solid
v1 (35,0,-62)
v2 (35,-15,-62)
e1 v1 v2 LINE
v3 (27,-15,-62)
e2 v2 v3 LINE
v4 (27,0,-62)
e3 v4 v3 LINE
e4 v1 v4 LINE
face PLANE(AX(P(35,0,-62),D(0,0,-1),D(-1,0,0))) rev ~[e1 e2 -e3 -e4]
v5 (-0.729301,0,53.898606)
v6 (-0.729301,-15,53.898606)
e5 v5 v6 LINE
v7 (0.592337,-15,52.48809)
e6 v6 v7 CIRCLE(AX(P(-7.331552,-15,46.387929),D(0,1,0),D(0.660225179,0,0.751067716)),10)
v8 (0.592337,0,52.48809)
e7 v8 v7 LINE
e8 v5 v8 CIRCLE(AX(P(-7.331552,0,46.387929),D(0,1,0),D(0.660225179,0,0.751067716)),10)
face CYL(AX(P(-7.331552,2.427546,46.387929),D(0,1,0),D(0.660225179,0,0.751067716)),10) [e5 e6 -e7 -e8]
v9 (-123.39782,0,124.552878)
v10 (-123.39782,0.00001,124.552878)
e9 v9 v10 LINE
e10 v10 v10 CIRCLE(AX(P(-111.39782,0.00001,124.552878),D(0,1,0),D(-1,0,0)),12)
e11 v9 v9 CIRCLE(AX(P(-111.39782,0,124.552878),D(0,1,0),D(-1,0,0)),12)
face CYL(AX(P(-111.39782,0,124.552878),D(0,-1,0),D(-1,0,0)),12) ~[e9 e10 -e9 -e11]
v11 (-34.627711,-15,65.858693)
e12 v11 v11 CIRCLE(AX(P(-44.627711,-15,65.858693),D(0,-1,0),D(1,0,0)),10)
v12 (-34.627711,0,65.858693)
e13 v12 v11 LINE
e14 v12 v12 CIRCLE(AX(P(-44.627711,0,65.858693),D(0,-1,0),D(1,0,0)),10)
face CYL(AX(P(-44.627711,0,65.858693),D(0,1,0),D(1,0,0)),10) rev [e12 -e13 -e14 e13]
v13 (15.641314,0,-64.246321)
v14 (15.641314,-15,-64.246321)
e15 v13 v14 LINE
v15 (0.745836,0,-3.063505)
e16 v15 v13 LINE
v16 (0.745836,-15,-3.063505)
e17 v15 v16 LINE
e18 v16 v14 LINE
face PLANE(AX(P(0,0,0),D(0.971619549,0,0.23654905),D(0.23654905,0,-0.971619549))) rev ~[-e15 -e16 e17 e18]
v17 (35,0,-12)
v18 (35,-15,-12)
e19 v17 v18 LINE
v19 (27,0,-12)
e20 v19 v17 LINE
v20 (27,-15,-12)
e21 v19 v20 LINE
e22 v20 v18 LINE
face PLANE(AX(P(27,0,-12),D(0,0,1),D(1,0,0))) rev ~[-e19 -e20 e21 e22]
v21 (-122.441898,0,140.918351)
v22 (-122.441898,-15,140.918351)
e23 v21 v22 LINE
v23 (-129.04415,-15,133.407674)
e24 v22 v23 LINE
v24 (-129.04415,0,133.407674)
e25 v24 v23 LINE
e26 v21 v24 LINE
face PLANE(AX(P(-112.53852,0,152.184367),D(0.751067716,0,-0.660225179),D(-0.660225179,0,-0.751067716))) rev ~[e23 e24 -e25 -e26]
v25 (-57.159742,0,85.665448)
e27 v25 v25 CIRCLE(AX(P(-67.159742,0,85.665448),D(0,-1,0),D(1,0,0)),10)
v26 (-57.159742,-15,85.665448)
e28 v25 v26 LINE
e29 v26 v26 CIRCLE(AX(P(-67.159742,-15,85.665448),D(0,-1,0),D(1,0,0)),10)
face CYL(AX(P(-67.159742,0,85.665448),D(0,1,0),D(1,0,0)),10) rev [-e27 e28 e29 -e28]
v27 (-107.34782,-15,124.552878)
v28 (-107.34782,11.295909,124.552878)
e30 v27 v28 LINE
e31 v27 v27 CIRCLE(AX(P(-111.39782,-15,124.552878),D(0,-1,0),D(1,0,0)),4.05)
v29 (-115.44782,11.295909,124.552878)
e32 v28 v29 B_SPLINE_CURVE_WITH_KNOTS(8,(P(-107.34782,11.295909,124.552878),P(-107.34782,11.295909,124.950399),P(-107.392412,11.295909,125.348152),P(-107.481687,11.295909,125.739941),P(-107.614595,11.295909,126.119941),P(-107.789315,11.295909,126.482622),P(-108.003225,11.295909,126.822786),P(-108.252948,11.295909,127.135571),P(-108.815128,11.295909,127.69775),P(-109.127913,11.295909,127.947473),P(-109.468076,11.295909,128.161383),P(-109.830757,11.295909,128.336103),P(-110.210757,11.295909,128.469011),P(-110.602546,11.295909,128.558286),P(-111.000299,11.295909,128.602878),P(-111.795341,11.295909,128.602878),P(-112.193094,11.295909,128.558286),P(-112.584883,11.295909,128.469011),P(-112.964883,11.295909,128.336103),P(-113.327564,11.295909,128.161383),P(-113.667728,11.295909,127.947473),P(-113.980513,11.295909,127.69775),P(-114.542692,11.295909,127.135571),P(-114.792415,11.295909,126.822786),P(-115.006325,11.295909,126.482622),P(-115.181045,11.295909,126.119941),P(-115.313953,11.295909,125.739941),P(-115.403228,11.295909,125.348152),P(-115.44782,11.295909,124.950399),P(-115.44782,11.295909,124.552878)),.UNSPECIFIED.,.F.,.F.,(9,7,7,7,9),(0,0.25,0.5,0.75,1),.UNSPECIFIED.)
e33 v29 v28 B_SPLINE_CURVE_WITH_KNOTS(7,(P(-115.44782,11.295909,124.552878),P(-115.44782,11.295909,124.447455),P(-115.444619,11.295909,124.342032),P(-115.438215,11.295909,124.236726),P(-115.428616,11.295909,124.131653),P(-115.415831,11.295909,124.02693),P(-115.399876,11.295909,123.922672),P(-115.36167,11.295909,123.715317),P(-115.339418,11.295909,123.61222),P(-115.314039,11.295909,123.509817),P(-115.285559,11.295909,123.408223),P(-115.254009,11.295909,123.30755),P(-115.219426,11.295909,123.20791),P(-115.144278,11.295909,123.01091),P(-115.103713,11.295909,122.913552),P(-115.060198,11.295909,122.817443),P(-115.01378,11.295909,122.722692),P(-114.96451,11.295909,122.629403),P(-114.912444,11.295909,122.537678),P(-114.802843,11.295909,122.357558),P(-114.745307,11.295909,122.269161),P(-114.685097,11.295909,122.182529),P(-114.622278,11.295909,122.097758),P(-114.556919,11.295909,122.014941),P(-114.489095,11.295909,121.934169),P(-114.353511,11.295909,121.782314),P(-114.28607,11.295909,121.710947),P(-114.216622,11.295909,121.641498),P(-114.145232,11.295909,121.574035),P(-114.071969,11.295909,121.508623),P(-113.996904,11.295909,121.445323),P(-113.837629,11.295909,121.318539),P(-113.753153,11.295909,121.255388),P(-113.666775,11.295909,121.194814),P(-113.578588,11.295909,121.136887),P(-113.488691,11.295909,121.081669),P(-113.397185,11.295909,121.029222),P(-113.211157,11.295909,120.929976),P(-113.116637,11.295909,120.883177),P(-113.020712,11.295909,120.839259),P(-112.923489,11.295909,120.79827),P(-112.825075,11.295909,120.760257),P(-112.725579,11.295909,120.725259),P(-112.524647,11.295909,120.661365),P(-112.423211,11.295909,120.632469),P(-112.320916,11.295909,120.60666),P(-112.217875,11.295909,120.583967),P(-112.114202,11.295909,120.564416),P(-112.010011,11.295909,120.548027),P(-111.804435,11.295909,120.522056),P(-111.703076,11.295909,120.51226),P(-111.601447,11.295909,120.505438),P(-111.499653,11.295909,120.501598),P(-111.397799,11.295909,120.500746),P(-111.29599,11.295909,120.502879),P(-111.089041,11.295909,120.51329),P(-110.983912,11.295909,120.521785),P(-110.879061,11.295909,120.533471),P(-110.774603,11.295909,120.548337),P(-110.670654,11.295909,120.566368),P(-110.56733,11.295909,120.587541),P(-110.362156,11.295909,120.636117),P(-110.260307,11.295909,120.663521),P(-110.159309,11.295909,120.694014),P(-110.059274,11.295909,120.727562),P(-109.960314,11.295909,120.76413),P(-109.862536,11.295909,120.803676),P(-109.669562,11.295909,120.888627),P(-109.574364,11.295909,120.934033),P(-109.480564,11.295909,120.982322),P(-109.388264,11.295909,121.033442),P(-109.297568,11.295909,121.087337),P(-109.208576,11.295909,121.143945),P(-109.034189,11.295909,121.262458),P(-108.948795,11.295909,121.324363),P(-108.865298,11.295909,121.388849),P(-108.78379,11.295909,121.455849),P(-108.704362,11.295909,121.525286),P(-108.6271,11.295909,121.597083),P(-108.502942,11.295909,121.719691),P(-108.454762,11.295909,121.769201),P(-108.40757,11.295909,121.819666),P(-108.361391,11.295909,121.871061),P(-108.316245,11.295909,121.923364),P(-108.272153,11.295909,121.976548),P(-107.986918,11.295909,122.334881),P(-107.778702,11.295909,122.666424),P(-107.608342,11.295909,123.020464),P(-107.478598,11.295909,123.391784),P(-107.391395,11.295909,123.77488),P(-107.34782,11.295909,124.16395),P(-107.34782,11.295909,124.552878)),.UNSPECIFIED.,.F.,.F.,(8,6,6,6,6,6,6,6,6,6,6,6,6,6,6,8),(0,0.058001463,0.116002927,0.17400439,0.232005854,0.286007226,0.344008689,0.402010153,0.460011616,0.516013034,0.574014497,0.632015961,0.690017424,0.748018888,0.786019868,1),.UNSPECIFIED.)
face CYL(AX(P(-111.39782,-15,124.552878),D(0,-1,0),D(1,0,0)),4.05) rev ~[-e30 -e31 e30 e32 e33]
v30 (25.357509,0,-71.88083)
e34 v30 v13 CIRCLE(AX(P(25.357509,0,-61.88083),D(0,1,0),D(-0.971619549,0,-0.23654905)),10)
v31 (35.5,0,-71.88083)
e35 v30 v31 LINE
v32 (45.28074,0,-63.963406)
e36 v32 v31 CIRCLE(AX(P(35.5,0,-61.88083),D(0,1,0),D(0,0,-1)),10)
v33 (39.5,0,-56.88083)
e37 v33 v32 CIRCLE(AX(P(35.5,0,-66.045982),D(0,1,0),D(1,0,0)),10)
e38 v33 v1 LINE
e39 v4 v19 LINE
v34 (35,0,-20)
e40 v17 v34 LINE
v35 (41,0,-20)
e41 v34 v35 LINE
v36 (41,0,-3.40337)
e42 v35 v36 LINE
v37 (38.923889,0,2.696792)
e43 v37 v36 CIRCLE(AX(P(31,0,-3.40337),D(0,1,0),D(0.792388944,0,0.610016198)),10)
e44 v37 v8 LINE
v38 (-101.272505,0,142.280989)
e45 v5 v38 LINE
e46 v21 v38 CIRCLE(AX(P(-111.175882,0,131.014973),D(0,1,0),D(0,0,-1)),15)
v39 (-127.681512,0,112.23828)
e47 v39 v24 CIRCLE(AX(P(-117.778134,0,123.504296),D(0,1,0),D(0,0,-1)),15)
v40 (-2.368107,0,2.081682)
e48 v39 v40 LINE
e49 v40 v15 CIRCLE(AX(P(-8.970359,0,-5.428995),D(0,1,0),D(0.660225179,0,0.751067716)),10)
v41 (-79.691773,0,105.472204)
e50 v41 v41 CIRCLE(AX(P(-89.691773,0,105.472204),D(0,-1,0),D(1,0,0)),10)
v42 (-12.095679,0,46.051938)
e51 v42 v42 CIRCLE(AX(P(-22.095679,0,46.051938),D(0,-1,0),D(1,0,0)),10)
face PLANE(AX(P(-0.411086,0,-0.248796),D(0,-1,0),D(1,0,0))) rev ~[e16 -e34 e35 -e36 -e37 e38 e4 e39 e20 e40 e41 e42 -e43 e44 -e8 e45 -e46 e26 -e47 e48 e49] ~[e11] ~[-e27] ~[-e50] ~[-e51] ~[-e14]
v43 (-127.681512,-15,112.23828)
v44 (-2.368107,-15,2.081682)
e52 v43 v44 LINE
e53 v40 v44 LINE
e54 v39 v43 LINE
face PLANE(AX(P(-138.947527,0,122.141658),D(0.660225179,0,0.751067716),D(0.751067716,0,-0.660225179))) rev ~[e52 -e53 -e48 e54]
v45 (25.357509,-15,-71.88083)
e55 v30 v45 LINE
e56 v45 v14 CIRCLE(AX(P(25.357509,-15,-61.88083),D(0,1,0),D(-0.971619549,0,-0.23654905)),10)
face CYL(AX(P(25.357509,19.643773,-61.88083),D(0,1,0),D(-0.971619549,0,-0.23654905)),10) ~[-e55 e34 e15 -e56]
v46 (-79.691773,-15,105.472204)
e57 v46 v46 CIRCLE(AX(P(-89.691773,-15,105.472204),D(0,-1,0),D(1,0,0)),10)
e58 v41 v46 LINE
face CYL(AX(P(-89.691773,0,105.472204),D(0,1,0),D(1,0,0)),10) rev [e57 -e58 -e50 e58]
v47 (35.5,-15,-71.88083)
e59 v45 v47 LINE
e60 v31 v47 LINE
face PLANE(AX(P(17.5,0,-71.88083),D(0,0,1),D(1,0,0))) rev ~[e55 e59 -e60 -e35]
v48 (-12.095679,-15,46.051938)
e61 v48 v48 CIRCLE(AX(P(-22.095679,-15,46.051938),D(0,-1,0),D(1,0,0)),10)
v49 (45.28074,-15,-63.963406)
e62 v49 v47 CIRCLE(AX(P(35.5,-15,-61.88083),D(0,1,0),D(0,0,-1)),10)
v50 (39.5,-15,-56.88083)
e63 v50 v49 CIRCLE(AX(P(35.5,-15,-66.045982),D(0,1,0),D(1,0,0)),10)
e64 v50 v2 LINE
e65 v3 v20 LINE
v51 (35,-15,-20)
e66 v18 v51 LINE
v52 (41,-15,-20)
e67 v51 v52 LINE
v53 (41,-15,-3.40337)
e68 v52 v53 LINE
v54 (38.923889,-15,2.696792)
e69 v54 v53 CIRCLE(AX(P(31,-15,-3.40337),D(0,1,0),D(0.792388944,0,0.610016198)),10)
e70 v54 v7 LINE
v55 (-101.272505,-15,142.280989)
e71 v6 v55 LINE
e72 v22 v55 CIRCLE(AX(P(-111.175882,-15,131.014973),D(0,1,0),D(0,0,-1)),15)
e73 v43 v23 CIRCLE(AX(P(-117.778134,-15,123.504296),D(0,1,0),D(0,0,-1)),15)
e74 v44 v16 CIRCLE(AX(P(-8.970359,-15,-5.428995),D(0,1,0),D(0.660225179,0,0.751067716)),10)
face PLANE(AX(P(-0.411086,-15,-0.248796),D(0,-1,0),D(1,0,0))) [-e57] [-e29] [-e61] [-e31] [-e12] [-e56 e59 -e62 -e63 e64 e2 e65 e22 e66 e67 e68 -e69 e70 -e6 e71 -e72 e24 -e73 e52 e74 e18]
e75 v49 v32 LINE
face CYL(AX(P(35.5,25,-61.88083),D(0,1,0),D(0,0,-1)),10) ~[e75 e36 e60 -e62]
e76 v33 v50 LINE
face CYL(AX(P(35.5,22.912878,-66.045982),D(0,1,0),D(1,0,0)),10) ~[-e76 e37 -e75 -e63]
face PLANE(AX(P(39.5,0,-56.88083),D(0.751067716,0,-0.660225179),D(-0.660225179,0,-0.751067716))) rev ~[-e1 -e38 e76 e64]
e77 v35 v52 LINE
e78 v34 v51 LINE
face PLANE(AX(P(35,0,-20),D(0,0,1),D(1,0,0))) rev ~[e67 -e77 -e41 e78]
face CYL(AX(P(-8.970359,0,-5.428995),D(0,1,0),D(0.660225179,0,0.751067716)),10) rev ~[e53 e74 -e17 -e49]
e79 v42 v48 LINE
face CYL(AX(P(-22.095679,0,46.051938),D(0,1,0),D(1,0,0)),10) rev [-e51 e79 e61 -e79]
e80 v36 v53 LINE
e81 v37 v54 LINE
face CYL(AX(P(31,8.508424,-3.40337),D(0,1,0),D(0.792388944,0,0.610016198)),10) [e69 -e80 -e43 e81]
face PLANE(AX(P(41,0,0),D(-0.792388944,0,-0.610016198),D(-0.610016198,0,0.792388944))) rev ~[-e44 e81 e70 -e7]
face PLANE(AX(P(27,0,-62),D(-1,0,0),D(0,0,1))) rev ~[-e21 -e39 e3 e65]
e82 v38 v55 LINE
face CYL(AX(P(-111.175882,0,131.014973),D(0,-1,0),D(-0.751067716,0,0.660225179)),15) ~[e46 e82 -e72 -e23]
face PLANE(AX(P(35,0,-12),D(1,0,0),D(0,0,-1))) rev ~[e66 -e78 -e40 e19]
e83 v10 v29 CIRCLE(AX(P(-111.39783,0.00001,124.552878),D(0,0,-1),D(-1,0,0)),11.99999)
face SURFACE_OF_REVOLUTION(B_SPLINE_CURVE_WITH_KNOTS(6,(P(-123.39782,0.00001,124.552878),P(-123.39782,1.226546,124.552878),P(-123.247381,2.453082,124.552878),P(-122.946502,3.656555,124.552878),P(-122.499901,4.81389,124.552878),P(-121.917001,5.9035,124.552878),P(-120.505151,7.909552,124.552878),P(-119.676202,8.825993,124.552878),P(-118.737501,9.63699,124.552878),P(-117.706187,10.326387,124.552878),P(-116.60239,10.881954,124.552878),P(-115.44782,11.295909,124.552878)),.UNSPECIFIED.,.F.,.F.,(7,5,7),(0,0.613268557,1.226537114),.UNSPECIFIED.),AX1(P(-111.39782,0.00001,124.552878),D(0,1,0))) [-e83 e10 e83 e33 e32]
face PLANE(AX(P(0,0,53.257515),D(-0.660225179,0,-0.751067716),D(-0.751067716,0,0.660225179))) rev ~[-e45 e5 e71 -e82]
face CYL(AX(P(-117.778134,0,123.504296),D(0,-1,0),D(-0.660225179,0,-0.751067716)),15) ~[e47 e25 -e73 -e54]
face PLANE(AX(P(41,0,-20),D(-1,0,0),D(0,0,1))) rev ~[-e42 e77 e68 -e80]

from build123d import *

# Parameters (mm, degrees)
F0_R         = 10
F1_DEPTH     = 15
F2_R         = 15
F3_T1_DEPTH  = 32.0168478214
F3_T3_DEPTH  = 19.855092474
F3_T5_DEPTH  = 60.8257569496
F3_T7_DEPTH  = 65
F3_T9_DEPTH  = 54.2875458035
F3_T11_DEPTH = 15
F5_R         = 12
F6_DEPTH     = 12
F7_R         = 11.99999
F8_R         = 4.05
F9_DEPTH     = 27.001


# Not quite as in the source:
# - a fillet or chamfer that OpenCascade refuses, or shapes differently, is made with other operations: its cross-section is extruded or revolved along the edge and cut away or added
# - a fillet or chamfer is up to 0.001 mm smaller than in the source, because OpenCascade refuses the exact size


with BuildPart() as f1:
    # F0 (on Front) → F1 (new body)
    with BuildSketch(Plane.XZ):
        Polygon((-138.9475274131, 122.1416580278), (0, 0), (17.5, -71.8808303125), (45.5, -71.8808303125), (45.5, -56.8808303125), (39.5, -56.8808303125), (35, -62), (27, -62), (27, -12), (35, -12), (35, -20), (41, -20), (41, 0), (0, 53.2575148171), (-112.5385202719, 152.1843666577), align=None)
        with Locations((-67.1597420143, 85.6654484175)):
            Circle(F0_R, mode=Mode.SUBTRACT)
        with Locations((-89.6917734867, 105.4722037734)):
            Circle(F0_R, mode=Mode.SUBTRACT)
        with Locations((-44.6277105419, 65.8586930616)):
            Circle(F0_R, mode=Mode.SUBTRACT)
        with Locations((-22.0956790695, 46.0519377058)):
            Circle(F0_R, mode=Mode.SUBTRACT)
    extrude(amount=F1_DEPTH)

    # F2
    f2_edges = [f1.edges().sort_by_distance(p)[0] for p in [
        (-112.53852, -7.5, 152.184367),
        (-138.947527, -7.5, 122.141658),
    ]]
    fillet(f2_edges, radius=F2_R)

    # F3: fillet of radius 10 on 6 edges, made by hand

    # F3_s2 → F3_t1 (cut)
    with BuildSketch(Plane.XZ.offset(-8.5084239107)):
        with BuildLine():
            ThreePointArc((38.9238894384, 2.6967924145), (40.4667548395, -0.1814830349), (41, -3.4033695643))
            Line((41, -3.4033695643), (41.2, -3.4033695643))
            Line((41.2, -3.4033695643), (41.2, 0.0680673913))
            Line((41.2, 0.0680673913), (39.0823672272, 2.8187956541))
            Line((39.0823672272, 2.8187956541), (38.9238894384, 2.6967924145))
        make_face()
    extrude(amount=F3_T1_DEPTH, mode=Mode.SUBTRACT)

    # F3_s4 → F3_t3 (cut)
    with BuildSketch(Plane.XZ.offset(-2.427546237)):
        with BuildLine():
            ThreePointArc((-0.7293006428, 53.8986056762), (-0.0343212423, 53.2253561798), (0.5923370103, 52.4880904975))
            Line((0.5923370103, 52.4880904975), (0.750814799, 52.6100937371))
            Line((0.750814799, 52.6100937371), (0.1466310486, 53.3949065431))
            Line((0.1466310486, 53.3949065431), (-0.5972556071, 54.0488192193))
            Line((-0.5972556071, 54.0488192193), (-0.7293006428, 53.8986056762))
        make_face()
    extrude(amount=F3_T3_DEPTH, mode=Mode.SUBTRACT)

    # F3_s6 → F3_t5 (cut)
    with BuildSketch(Plane.XZ.offset(-22.9128784748)):
        with BuildLine():
            ThreePointArc((45.5, -66.0459817024), (43.8666002653, -60.5687561273), (39.5, -56.8808303125))
            Line((39.5, -56.8808303125), (39.58, -56.6975272847))
            ThreePointArc((39.58, -56.6975272847), (42.5, -56.6808303125), (45.5, -56.6808303125))
            Line((45.5, -56.6808303125), (45.7, -56.8808303125))
            Line((45.7, -56.8808303125), (45.7, -66.0459817024))
            Line((45.7, -66.0459817024), (45.5, -66.0459817024))
        make_face()
    extrude(amount=F3_T5_DEPTH, mode=Mode.SUBTRACT)

    # F3_s8 → F3_t7 (cut)
    with BuildSketch(Plane.XZ.offset(-25)):
        with BuildLine():
            ThreePointArc((35.5, -71.8808303125), (42.5710678119, -68.9518981244), (45.5, -61.8808303125))
            Line((45.5, -61.8808303125), (45.7, -61.8808303125))
            Line((45.7, -61.8808303125), (45.7, -72.0808303125))
            Line((45.7, -72.0808303125), (35.5, -72.0808303125))
            Line((35.5, -72.0808303125), (35.5, -71.8808303125))
        make_face()
    extrude(amount=F3_T7_DEPTH, mode=Mode.SUBTRACT)

    # F3_s10 → F3_t9 (cut)
    with BuildSketch(Plane.XZ.offset(-19.6437729018)):
        with BuildLine():
            ThreePointArc((15.6413136753, -64.2463208091), (19.1791155574, -69.7438737743), (25.3575091607, -71.8808303125))
            Line((25.3575091607, -71.8808303125), (25.3575091607, -72.0808303125))
            Line((25.3575091607, -72.0808303125), (17.3428498168, -72.0808303125))
            Line((17.3428498168, -72.0808303125), (15.4469897656, -64.2936306191))
            Line((15.4469897656, -64.2936306191), (15.6413136753, -64.2463208091))
        make_face()
    extrude(amount=F3_T9_DEPTH, mode=Mode.SUBTRACT)

    # F3_s12 → F3_t11 (join)
    with BuildSketch(Plane.XZ):
        with BuildLine():
            ThreePointArc((-2.3681074114, 2.0816819918), (-0.4151755765, -0.2512704506), (0.7458362887, -3.0635046691))
            Line((0.7458362887, -3.0635046691), (0.9401601984, -3.0161948591))
            Line((0.9401601984, -3.0161948591), (0.1794071839, 0.1085799033))
            Line((0.1794071839, 0.1085799033), (-2.2360623757, 2.2318955349))
            Line((-2.2360623757, 2.2318955349), (-2.3681074114, 2.0816819918))
        make_face()
    extrude(amount=F3_T11_DEPTH)

    # F5 (on face) → F6 (join)
    with BuildSketch(Plane(origin=(0, 0, 0), x_dir=(-1, 0, 0), z_dir=(0, 1, 0))):
        with Locations((111.3978201201, 124.552878143)):
            Circle(F5_R)
    extrude(amount=F6_DEPTH)

    # F7 (radius 12 in the source; OpenCascade refuses exactly that, so slightly less here)
    f7_edges = [f1.edges().sort_by_distance(p)[0] for p in [
        (-99.39782, 12, 124.552878),
    ]]
    fillet(f7_edges, radius=F7_R)

    # F8 (on face) → F9 (cut, through all)
    with BuildSketch(Plane.XZ.offset(15)):
        with Locations((-111.3978201201, 124.552878143)):
            Circle(F8_R)
    extrude(amount=-F9_DEPTH, mode=Mode.SUBTRACT)


solid = f1.part
